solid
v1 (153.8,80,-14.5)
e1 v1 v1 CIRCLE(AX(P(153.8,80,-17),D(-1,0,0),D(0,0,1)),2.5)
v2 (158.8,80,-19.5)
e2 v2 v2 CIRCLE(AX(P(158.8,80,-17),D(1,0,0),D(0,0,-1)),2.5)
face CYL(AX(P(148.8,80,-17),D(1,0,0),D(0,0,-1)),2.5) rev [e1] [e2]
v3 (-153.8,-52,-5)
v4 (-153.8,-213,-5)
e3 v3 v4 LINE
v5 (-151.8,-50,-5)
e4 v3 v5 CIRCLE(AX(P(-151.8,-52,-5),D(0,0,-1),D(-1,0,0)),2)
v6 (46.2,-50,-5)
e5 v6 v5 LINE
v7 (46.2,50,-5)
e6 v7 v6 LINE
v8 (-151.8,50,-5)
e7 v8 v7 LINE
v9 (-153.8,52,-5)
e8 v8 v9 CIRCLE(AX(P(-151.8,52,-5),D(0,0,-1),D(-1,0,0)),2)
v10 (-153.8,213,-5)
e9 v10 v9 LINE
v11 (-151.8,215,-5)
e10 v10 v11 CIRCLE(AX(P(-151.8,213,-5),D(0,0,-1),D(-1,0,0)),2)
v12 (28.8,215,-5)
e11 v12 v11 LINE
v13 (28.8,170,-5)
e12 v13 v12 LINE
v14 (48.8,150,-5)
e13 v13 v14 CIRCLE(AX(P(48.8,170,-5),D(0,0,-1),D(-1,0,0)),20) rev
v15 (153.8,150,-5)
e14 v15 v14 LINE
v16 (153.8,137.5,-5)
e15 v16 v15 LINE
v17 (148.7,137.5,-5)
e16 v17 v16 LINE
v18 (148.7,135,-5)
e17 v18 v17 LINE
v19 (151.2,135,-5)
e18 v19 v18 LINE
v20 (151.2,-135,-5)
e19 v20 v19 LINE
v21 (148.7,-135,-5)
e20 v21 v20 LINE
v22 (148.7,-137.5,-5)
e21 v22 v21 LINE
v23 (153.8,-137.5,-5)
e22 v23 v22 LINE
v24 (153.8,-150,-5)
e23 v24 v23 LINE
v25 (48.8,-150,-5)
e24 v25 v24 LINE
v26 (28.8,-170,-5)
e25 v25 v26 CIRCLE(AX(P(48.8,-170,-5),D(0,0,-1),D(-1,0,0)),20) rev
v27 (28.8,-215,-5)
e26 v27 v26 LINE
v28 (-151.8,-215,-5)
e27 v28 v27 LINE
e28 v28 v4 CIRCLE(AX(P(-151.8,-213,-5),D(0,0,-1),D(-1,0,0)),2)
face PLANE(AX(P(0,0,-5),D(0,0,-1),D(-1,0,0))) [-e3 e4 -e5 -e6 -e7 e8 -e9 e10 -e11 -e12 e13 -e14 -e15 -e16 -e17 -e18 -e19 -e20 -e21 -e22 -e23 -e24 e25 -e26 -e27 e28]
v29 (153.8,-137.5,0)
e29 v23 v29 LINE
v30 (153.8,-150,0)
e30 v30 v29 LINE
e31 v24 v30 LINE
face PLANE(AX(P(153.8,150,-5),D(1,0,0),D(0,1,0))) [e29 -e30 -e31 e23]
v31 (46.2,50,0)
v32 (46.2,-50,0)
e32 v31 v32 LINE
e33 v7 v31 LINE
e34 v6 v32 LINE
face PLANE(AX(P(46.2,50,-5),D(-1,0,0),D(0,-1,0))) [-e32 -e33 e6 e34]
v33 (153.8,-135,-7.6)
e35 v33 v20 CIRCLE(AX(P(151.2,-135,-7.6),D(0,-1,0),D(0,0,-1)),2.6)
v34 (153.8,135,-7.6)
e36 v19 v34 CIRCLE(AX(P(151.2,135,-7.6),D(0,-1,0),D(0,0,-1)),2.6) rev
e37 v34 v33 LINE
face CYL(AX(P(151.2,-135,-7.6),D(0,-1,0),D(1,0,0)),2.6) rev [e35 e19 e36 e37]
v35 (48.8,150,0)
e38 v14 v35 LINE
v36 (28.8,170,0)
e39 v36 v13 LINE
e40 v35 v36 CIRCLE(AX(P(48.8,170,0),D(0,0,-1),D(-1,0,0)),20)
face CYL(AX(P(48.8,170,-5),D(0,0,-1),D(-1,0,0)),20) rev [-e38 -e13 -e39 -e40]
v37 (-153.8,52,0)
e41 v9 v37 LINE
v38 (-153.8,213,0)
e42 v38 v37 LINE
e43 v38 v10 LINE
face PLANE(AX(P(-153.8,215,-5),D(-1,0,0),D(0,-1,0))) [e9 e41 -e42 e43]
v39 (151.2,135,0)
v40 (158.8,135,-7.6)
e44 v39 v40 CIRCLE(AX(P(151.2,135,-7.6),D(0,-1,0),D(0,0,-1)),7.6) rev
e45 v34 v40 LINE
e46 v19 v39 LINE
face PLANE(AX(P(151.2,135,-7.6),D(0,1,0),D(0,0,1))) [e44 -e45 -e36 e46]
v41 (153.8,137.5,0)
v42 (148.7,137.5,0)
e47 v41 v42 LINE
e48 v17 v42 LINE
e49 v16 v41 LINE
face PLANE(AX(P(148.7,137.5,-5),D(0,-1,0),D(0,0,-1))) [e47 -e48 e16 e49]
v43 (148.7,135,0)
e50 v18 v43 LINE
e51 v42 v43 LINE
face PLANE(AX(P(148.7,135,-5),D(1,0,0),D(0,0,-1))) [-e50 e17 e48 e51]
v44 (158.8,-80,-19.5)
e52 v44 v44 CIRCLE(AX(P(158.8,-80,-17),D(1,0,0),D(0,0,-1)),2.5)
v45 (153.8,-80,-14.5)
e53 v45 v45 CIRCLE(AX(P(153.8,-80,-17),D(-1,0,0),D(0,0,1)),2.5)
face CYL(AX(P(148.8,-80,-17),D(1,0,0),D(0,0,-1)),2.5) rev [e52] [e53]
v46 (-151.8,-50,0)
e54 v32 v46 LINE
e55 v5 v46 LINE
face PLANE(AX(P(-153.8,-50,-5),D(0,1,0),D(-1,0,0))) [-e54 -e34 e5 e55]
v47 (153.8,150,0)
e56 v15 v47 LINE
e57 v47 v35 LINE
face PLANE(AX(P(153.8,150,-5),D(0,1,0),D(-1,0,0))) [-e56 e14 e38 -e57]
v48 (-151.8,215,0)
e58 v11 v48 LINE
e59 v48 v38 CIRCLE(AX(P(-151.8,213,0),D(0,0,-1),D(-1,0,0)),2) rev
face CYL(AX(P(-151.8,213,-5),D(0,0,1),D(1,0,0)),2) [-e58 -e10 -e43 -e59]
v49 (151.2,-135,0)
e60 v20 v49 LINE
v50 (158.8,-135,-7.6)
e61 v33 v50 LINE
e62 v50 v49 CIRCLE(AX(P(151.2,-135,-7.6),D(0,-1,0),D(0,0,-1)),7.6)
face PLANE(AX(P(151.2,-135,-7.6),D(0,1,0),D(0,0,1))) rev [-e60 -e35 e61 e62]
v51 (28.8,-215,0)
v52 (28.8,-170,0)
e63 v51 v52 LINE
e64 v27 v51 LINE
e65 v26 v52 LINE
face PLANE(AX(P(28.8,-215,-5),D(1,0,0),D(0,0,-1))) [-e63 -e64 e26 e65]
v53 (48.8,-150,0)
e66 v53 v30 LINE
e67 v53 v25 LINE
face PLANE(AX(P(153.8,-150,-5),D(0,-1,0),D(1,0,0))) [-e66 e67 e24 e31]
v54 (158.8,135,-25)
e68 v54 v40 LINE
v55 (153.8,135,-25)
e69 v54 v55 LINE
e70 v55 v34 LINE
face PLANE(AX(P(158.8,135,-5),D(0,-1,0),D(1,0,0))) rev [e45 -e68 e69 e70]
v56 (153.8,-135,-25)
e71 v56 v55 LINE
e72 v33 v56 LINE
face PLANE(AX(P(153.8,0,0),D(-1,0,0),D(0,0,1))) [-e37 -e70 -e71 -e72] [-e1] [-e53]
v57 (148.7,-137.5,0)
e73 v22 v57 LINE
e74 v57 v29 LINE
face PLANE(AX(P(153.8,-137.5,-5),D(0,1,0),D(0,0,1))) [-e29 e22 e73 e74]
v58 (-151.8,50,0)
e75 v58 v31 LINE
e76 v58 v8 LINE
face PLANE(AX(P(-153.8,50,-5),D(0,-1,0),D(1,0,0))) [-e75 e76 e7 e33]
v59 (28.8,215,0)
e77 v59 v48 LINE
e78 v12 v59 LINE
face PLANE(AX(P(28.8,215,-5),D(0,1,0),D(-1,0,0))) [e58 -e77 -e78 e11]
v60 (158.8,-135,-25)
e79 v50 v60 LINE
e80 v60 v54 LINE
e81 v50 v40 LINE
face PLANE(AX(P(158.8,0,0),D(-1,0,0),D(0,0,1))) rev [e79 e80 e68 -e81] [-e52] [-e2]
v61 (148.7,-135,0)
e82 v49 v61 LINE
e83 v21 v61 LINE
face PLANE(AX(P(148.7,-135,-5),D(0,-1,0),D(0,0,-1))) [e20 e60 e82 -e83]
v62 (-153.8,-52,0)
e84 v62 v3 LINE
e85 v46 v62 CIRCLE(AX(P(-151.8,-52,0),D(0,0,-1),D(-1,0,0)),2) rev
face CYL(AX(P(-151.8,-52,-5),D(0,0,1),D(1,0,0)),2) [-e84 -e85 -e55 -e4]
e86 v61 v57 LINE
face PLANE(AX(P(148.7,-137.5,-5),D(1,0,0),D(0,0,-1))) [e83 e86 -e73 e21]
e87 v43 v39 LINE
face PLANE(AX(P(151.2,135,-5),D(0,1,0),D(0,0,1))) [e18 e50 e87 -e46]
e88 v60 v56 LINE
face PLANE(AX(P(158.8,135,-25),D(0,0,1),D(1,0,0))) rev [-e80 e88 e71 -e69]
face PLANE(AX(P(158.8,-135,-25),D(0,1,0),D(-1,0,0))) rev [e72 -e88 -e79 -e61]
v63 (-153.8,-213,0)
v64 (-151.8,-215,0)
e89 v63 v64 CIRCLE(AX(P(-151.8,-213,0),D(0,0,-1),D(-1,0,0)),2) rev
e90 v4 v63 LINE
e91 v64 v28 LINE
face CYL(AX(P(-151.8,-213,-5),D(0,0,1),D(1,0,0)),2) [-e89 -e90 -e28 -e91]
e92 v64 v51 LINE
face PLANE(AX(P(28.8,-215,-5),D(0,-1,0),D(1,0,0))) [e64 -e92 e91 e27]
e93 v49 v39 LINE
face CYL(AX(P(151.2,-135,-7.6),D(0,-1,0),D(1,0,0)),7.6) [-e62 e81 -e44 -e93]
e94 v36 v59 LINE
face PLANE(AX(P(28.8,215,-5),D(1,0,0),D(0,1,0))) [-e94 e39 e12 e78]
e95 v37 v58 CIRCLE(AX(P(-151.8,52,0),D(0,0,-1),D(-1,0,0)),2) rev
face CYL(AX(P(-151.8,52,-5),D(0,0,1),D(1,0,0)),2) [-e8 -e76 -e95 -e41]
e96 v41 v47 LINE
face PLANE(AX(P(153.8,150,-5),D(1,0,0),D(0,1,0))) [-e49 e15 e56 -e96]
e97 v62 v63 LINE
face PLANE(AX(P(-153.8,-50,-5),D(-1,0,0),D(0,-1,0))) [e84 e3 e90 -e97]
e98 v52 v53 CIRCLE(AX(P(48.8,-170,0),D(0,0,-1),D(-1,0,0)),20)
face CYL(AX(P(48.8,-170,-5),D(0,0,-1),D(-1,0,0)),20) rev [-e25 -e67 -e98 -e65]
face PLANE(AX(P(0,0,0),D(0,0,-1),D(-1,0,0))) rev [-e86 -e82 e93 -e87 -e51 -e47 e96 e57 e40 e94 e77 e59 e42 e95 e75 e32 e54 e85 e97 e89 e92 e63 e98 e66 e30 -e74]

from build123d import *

# Parameters (mm, degrees)
BASE_FLANGE1_DEPTH            = 5
EDGE_FLANGE1_STRIP_W          = 25.2
EDGE_FLANGE1_STRIP_H          = 5
EDGE_FLANGE1_STRIP_CUT_DEPTH  = 270
EDGE_FLANGE1_RELIEF_W         = 27.7
EDGE_FLANGE1_RELIEF_H         = 2.5
EDGE_FLANGE1_RELIEF_CUT_DEPTH = 5
EDGE_FLANGE1_DEPTH            = 270
SKETCH9_R                     = 2.5
CUT_EXTRUDE1_DEPTH            = 10
FILLET1_R                     = 20
FILLET2_R                     = 2


# Sheet-metal steps are written as plain solids
with BuildPart() as part:
    # Sketch1 → Base-Flange1 (new body)
    with BuildSketch(Plane.XY):
        Polygon((28.8, 215), (-153.8, 215), (-153.8, 50), (46.2, 50), (46.2, -50), (-153.8, -50), (-153.8, -215), (28.8, -215), (28.8, -150), (153.8, -150), (153.8, 150), (28.8, 150), align=None)
    extrude(amount=-BASE_FLANGE1_DEPTH)

    # Edge-Flange1 strip (across the edge) → Edge-Flange1 strip cut (cut)
    with BuildSketch(Plane(origin=(153.8, 135, -5), x_dir=(-1, 0, 0), z_dir=(0, -1, 0))):
        with Locations((-10, -2.5)):
            Rectangle(EDGE_FLANGE1_STRIP_W, EDGE_FLANGE1_STRIP_H)
    extrude(amount=EDGE_FLANGE1_STRIP_CUT_DEPTH, mode=Mode.SUBTRACT)

    # Edge-Flange1 relief (on the sheet) → Edge-Flange1 relief cut (cut)
    with BuildSketch(Plane(origin=(151.2, 135, -5), x_dir=(-1, 0, 0), z_dir=(0, 0, -1))):
        with Locations((-11.35, 1.25)):
            Rectangle(EDGE_FLANGE1_RELIEF_W, EDGE_FLANGE1_RELIEF_H)
        with Locations((-11.35, -271.25)):
            Rectangle(EDGE_FLANGE1_RELIEF_W, EDGE_FLANGE1_RELIEF_H)
    extrude(amount=-EDGE_FLANGE1_RELIEF_CUT_DEPTH, mode=Mode.SUBTRACT)

    # Edge-Flange1 section (across the edge) → Edge-Flange1 (add)
    with BuildSketch(Plane(origin=(153.8, 135, -5), x_dir=(-1, 0, 0), z_dir=(0, -1, 0))):
        with BuildLine():
            Line((-5, 2.6), (-5, 20))
            Line((-5, 20), (0, 20))
            Line((0, 20), (0, 2.6))
            ThreePointArc((0, 2.6), (0.761522369, 0.761522369), (2.6, 0))
            Line((2.6, 0), (2.6, -5))
            ThreePointArc((2.6, -5), (-2.774011537, -2.774011537), (-5, 2.6))
        make_face()
    extrude(amount=EDGE_FLANGE1_DEPTH)

    # Sketch9 → Cut-Extrude1 (cut)
    with BuildSketch(Plane(origin=(158.8, 0, 0), x_dir=(0, 0, -1), z_dir=(1, 0, 0))):
        with Locations((17, 80)):
            Circle(SKETCH9_R)
        with Locations((17, -80)):
            Circle(SKETCH9_R)
    extrude(amount=-CUT_EXTRUDE1_DEPTH, mode=Mode.SUBTRACT)

    # Fillet1
    fillet1_edges = [part.edges().sort_by_distance(p)[0] for p in [
        (28.8, 150, -2.5),
        (28.8, -150, -2.5),
    ]]
    fillet(fillet1_edges, radius=FILLET1_R)

    # Fillet2
    fillet2_edges = [part.edges().sort_by_distance(p)[0] for p in [
        (-153.8, -50, -2.5),
        (-153.8, 50, -2.5),
        (-153.8, 215, -2.5),
        (-153.8, -215, -2.5),
    ]]
    fillet(fillet2_edges, radius=FILLET2_R)


solid = part.part
